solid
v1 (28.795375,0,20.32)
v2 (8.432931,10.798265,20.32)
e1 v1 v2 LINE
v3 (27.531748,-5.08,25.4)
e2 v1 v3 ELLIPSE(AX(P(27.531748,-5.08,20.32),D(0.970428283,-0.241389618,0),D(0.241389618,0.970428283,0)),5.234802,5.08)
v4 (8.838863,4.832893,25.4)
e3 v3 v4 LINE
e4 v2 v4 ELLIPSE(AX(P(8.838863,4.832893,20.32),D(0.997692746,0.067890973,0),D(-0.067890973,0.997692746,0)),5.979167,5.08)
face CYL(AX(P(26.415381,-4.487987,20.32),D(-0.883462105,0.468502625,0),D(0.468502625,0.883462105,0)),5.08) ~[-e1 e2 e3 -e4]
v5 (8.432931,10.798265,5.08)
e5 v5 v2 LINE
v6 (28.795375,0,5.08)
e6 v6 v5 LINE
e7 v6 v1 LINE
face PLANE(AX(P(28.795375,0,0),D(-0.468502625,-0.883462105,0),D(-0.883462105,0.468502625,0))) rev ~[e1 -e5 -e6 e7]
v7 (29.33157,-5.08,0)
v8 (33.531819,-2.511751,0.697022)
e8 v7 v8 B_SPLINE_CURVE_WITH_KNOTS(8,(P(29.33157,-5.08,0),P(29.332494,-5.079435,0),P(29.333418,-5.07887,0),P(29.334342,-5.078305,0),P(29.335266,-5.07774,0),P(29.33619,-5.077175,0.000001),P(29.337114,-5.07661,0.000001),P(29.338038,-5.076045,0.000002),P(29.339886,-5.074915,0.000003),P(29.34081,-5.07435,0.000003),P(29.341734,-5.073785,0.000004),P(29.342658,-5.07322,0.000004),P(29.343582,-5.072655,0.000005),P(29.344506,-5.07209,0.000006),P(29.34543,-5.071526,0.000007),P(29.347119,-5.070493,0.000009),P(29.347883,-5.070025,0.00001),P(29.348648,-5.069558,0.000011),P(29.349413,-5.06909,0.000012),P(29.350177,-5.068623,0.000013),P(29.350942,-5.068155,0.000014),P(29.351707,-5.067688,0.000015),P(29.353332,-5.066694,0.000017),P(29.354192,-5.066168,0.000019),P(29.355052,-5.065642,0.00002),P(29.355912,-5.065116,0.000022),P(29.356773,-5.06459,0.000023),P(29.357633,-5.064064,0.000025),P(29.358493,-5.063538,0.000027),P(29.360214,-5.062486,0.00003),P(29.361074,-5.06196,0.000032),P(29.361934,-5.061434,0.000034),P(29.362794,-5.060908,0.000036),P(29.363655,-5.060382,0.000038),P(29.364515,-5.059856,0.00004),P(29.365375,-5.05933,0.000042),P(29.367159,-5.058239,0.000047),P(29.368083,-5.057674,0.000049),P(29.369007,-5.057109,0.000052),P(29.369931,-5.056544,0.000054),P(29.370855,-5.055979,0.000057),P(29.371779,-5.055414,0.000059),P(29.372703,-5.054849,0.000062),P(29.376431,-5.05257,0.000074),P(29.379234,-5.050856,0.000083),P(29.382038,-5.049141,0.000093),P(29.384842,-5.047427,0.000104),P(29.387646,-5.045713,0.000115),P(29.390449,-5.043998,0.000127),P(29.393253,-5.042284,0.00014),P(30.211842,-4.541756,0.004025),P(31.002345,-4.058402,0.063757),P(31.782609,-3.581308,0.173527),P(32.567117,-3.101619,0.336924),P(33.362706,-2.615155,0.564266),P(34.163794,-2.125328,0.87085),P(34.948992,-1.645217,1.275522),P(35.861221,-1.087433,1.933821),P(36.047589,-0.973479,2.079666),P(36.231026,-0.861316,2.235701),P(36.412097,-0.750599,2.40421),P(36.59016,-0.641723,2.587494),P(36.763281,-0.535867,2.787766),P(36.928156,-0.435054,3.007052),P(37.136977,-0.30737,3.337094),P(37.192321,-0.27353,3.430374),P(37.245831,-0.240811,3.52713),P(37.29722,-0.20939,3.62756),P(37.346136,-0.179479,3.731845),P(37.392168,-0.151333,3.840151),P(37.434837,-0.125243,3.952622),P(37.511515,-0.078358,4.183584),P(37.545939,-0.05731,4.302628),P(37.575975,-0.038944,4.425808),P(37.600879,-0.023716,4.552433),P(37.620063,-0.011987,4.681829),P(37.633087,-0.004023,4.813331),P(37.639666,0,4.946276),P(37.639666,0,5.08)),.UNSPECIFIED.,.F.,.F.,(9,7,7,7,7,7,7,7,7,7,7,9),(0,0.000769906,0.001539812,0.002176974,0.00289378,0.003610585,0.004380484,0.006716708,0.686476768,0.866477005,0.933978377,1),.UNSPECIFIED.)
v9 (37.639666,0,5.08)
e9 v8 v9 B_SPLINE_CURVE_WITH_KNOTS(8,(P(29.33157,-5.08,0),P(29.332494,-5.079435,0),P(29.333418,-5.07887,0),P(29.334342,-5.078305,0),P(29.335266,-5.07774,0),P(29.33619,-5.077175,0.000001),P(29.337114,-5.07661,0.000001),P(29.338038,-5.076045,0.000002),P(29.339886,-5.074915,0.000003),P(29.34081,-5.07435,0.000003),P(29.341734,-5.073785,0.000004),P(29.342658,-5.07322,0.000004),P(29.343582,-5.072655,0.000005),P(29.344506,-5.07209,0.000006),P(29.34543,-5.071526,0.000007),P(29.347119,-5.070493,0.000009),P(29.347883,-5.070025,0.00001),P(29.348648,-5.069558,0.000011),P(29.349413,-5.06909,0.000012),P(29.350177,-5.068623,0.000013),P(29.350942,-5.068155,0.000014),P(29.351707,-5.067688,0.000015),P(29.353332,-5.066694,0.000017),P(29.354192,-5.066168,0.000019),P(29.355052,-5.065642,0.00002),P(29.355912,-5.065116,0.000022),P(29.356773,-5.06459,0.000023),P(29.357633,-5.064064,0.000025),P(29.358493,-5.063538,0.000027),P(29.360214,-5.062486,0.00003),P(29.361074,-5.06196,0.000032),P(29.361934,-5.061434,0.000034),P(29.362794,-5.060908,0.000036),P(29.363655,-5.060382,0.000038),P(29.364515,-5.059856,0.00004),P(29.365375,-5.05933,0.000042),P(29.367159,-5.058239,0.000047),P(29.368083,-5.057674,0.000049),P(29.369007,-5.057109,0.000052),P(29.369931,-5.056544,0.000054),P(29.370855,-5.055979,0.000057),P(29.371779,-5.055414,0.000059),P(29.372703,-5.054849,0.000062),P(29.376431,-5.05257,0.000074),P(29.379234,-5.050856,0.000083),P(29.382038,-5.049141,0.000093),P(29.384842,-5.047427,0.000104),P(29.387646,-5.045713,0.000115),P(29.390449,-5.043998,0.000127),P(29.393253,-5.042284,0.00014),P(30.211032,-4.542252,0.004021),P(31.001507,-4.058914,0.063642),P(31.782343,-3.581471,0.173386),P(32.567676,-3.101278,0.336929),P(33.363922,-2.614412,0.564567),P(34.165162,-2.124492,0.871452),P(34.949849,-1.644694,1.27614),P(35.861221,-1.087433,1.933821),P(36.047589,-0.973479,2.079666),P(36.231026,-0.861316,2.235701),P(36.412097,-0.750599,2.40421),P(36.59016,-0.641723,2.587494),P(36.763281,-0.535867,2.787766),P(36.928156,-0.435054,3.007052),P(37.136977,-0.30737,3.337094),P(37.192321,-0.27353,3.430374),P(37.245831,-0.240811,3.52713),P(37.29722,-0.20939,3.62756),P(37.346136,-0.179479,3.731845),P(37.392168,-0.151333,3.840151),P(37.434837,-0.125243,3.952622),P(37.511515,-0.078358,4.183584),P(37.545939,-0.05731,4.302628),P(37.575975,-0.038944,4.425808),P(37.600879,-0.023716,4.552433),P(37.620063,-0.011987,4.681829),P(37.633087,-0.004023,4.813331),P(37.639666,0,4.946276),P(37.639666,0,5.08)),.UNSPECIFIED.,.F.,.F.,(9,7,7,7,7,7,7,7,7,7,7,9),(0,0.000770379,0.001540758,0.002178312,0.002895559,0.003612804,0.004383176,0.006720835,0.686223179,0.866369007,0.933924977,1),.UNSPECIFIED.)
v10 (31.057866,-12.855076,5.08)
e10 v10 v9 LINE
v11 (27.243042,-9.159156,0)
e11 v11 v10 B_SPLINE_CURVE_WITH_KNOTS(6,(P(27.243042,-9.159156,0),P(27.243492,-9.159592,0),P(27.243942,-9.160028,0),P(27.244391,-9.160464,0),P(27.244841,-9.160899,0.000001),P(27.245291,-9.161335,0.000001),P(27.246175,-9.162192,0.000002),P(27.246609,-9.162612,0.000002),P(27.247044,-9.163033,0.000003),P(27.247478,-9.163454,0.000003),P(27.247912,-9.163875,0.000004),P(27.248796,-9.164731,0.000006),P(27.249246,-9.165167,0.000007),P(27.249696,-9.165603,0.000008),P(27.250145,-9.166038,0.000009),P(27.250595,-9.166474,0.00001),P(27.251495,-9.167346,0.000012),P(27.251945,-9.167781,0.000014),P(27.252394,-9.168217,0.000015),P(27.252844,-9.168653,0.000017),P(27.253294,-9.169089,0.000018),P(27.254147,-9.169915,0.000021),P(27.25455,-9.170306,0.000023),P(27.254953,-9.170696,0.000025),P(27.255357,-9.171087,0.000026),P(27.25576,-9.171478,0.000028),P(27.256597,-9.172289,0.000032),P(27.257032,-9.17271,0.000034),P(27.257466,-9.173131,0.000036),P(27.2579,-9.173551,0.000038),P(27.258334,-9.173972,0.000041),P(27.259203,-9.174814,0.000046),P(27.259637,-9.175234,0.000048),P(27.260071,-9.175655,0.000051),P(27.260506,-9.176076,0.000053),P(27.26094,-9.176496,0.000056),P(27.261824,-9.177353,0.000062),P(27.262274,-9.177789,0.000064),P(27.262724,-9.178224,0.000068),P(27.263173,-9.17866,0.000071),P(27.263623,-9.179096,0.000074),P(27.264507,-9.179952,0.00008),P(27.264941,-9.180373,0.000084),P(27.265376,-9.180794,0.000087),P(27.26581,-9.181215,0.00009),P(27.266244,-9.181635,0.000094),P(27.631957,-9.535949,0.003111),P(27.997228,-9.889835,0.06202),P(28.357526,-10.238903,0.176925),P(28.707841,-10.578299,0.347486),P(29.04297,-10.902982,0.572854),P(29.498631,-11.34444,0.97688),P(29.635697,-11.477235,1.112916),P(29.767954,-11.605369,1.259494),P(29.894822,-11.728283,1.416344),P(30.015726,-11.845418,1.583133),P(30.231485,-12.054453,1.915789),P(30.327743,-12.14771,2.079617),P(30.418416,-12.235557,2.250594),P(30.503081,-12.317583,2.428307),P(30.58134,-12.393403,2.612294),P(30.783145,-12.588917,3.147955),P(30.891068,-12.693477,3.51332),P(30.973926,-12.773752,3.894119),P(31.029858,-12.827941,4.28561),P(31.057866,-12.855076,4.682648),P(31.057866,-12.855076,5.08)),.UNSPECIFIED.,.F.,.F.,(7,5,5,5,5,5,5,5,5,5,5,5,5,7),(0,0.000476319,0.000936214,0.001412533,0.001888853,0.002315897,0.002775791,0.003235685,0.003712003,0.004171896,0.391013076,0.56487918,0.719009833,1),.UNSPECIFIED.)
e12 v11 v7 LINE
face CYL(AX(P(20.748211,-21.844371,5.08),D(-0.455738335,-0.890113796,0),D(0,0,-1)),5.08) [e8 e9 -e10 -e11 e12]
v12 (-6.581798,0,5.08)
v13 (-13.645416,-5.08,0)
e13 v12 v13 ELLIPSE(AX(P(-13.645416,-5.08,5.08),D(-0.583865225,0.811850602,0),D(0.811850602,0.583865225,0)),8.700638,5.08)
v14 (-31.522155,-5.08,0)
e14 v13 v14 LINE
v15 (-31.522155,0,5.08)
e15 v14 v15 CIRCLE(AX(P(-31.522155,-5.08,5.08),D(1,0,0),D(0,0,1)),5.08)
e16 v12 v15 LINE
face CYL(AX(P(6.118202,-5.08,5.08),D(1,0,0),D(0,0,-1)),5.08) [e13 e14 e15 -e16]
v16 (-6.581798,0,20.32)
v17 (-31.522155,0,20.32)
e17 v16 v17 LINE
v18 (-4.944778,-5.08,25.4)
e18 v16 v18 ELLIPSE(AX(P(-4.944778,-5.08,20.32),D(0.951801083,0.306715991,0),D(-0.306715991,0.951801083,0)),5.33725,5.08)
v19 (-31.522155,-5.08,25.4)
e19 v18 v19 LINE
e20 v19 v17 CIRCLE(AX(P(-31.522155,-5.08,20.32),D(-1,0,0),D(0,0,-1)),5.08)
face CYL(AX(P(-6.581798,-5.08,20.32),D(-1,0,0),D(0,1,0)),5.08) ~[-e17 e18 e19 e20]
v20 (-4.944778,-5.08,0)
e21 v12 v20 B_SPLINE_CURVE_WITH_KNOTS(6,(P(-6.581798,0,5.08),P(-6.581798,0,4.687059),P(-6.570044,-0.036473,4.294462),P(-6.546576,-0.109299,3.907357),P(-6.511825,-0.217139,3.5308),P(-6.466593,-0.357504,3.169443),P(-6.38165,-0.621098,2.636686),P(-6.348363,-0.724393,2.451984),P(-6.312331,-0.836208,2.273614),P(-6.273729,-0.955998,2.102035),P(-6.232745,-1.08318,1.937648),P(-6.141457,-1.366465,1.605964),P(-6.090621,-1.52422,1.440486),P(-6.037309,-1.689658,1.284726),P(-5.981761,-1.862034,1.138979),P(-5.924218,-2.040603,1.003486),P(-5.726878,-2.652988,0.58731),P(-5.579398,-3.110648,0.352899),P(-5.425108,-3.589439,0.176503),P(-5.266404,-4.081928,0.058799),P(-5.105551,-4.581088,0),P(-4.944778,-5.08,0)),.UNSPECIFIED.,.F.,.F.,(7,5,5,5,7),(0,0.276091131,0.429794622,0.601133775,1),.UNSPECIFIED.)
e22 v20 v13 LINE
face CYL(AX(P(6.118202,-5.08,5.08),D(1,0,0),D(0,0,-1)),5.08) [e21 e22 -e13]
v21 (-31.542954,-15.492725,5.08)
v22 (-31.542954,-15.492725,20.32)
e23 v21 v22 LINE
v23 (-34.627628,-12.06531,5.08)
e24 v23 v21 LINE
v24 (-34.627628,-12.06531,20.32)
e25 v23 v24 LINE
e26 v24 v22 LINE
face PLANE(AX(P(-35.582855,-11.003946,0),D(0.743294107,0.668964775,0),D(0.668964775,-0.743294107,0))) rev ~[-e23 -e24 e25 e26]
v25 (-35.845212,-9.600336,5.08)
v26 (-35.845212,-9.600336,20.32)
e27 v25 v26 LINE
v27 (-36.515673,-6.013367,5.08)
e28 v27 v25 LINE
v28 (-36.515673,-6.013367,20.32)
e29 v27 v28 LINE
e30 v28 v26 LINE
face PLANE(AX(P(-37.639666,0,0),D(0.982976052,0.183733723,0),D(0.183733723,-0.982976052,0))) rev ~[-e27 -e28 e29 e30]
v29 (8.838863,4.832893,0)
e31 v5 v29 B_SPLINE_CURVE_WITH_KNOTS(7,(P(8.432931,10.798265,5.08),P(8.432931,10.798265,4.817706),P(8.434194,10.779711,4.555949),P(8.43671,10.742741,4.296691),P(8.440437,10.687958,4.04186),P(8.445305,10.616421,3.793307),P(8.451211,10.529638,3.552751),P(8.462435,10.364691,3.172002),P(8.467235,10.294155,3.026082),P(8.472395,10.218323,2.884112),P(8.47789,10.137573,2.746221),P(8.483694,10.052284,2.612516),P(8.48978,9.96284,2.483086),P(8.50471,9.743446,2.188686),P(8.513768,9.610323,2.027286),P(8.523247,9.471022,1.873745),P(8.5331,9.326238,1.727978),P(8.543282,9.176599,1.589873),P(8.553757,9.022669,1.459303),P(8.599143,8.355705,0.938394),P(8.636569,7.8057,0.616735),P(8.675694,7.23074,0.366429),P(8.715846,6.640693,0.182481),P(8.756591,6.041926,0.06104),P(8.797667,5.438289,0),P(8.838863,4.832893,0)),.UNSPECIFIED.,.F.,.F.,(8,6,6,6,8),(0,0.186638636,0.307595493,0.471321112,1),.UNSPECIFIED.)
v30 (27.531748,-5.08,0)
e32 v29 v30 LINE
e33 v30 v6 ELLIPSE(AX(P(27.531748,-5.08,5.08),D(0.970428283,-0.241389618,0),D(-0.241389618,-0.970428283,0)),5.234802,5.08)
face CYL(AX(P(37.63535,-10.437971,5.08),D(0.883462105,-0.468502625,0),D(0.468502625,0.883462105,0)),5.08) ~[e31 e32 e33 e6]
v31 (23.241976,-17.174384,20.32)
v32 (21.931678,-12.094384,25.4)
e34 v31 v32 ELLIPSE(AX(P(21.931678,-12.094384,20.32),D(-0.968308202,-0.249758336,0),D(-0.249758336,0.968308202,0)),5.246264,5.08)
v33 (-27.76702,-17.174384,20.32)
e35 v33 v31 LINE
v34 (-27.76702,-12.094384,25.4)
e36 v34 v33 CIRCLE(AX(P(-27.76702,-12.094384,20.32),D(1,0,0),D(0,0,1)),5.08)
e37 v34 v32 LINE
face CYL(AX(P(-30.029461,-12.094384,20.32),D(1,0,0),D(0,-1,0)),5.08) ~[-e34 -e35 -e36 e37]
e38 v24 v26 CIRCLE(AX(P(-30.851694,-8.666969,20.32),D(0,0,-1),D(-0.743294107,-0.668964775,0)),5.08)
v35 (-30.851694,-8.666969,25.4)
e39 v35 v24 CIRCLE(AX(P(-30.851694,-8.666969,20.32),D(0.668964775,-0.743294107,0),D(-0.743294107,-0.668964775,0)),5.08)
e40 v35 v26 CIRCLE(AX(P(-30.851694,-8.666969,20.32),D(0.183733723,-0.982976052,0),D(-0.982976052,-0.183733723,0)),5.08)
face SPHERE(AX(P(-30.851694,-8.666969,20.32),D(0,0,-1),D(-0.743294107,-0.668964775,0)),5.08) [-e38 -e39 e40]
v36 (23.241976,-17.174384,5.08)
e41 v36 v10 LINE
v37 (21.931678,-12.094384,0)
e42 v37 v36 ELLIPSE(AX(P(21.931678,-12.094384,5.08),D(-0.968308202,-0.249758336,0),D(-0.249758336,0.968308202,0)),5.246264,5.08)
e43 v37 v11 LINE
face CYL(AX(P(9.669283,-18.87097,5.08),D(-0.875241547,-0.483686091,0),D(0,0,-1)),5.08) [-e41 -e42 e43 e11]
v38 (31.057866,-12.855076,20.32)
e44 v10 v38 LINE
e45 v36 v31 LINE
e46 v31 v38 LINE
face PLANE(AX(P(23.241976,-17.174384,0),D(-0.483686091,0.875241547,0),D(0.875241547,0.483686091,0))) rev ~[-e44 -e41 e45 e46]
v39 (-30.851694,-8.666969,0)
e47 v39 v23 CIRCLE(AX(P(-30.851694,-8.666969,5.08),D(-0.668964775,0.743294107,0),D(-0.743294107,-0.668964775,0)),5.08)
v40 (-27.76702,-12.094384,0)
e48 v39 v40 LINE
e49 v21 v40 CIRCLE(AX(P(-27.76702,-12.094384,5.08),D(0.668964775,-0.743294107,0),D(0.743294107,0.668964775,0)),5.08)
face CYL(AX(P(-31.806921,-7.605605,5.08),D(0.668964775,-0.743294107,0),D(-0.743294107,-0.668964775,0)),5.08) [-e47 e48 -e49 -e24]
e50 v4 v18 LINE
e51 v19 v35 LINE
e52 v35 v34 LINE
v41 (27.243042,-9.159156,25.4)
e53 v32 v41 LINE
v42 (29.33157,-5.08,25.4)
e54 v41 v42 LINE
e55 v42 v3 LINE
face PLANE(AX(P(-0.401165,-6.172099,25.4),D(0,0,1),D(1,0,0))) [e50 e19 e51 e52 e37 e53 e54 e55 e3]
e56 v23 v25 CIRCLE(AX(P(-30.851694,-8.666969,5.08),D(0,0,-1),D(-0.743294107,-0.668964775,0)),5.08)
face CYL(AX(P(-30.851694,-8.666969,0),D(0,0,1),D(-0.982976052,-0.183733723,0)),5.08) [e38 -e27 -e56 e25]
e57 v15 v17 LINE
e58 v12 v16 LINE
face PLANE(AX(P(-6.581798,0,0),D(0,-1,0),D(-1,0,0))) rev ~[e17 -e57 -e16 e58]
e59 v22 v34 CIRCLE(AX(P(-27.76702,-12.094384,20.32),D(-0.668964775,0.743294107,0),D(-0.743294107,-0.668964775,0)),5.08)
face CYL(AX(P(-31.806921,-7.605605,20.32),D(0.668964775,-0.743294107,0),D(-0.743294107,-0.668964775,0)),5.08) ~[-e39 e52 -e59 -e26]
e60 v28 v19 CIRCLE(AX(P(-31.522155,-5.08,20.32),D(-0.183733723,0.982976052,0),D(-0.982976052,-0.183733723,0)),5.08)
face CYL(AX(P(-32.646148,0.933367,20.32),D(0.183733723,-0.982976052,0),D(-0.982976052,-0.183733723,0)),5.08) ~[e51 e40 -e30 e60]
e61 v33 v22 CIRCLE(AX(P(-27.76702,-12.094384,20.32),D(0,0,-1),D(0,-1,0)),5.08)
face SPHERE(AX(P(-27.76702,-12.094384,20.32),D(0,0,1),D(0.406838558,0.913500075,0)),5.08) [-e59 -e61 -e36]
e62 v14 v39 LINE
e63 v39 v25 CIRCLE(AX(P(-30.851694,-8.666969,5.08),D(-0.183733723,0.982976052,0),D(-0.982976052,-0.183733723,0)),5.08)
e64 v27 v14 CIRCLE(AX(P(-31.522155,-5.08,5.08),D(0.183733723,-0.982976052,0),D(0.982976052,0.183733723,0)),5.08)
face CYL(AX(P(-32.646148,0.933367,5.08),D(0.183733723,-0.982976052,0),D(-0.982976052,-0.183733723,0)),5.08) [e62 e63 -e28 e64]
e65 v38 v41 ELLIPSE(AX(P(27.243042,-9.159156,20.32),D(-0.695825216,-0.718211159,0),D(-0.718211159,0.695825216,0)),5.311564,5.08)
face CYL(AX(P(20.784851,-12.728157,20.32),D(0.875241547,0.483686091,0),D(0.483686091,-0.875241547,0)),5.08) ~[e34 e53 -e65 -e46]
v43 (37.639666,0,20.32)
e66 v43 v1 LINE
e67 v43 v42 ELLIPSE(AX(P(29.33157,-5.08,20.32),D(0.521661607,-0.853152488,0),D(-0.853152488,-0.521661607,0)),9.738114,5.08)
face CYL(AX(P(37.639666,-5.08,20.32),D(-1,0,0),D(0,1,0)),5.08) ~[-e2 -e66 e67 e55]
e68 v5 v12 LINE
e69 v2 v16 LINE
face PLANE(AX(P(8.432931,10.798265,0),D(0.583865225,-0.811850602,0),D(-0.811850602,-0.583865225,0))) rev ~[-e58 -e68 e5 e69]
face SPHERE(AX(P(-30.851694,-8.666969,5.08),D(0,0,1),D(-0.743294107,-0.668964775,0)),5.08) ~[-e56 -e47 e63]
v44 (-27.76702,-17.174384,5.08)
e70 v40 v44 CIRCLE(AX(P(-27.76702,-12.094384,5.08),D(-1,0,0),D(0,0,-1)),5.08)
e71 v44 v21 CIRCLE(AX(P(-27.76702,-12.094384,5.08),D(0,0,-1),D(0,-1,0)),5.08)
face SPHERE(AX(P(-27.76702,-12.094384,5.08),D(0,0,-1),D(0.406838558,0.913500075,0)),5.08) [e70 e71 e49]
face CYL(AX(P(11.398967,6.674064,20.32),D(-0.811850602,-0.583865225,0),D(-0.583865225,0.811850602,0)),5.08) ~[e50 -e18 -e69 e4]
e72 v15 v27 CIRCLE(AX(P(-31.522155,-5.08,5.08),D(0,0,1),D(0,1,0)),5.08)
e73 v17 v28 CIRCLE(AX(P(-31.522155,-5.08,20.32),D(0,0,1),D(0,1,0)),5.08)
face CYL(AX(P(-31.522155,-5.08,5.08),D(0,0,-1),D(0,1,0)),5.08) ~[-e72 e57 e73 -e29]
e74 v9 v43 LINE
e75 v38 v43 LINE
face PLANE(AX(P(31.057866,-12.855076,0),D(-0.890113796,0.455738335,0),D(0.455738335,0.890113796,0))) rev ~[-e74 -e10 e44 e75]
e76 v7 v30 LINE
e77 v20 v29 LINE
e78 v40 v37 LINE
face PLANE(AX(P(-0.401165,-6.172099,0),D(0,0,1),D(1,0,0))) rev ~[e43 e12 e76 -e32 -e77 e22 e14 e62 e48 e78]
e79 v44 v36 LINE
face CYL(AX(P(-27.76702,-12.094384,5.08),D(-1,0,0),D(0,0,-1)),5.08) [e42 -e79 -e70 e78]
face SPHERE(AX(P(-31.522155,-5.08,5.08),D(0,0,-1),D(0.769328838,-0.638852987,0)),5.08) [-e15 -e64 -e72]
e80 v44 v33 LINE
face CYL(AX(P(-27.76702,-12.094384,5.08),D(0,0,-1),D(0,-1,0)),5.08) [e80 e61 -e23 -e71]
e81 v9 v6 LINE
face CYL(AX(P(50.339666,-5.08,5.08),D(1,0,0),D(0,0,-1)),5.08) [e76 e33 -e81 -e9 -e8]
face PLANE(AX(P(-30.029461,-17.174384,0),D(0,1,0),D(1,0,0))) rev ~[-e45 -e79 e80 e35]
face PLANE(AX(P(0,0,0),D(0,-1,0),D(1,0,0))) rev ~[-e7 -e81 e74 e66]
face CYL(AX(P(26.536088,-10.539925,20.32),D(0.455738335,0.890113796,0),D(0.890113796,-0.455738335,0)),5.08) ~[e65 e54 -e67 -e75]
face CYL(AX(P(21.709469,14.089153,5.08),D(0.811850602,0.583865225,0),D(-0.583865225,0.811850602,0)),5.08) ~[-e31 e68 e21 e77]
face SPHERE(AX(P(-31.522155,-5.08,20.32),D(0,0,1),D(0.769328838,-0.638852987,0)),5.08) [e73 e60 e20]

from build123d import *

# Parameters (mm, degrees)
F2_DEPTH     = 25.4
F3_R         = 5.08
F4_T1_DEPTH  = 63.7089962256
F4_T3_DEPTH  = 34.3299805756
F4_T5_DEPTH  = 39.8420593032
F4_T7_DEPTH  = 15.24
F4_T12_DEPTH = 5.08
F4_T18_DEPTH = 5.08
F4_T24_DEPTH = 5.08
F4_T30_DEPTH = 5.08
F4_T36_DEPTH = 37.6403571065
F4_T41_DEPTH = 43.8944483223
F4_T46_DEPTH = 48.4484626095
F4_T51_DEPTH = 34.2442917913
F4_T57_DEPTH = 43.8944483223
F4_T61_DEPTH = 37.6403571065
F4_T68_DEPTH = 48.4484626095
F4_T72_DEPTH = 34.2442917913


# Not quite as in the source:
# - a fillet or chamfer that OpenCascade refuses, or shapes differently, is made with other operations: its cross-section is extruded or revolved along the edge and cut away or added


with BuildPart() as f2:
    # F1 (on face) → F2 (new body)
    with BuildSketch(Plane.XY):
        Polygon((8.4329312667, 10.7982652262), (-6.5817977302, 0), (-37.6396663487, 0), (-35.5828553438, -11.0039459541), (-30.0294607878, -17.1743836254), (23.241976276, -17.1743836254), (31.0578662902, -12.8550762311), (37.6396663487, 0), (28.7953745574, 0), align=None)
    extrude(amount=F2_DEPTH)

    # F3
    f3_edges = [f2.edges().sort_by_distance(p)[0] for p in [
        (-22.110732, 0, 25.4),
        (18.614153, 5.399133, 25.4),
        (33.21752, 0, 25.4),
        (34.348766, -6.427538, 25.4),
        (27.149921, -15.01473, 25.4),
        (-3.393742, -17.174384, 25.4),
        (-32.806158, -14.089165, 25.4),
        (-36.611261, -5.501973, 25.4),
        (-32.806158, -14.089165, 0),
        (-36.611261, -5.501973, 0),
        (-35.582855, -11.003946, 12.7),
        (0.925567, 5.399133, 25.4),
    ]]
    fillet(f3_edges, radius=F3_R)

    # F4: fillet of radius 5.08 on 11 edges, made by hand

    # F4_s2 → F4_t1 (cut)
    with BuildSketch(Plane.YZ.offset(-27.7670199495)):
        with BuildLine():
            ThreePointArc((-12.0943836254, 0), (-15.6864860738, 1.4878975516), (-17.1743836254, 5.08))
            Line((-17.1743836254, 5.08), (-17.1743836254, 0))
            Line((-17.1743836254, 0), (-12.0943836254, 0))
        make_face()
    extrude(amount=F4_T1_DEPTH, mode=Mode.SUBTRACT)

    # F4_s4 → F4_t3 (cut)
    with BuildSketch(Plane(origin=(-0.5817443509, -0.3214902809, 0), x_dir=(0, 0, 1), z_dir=(0.8752415471, 0.4836860907, 0))):
        with BuildLine():
            ThreePointArc((0, 21.1935547384), (1.4878975516, 24.7856571868), (5.08, 26.2735547384))
            Line((5.08, 26.2735547384), (0, 26.2735547384))
            Line((0, 26.2735547384), (0, 21.1935547384))
        make_face()
    extrude(amount=F4_T3_DEPTH, mode=Mode.SUBTRACT)

    # F4_s6 → F4_t5 (cut)
    with BuildSketch(Plane(origin=(-4.5520149502, -8.8906528107, 0), x_dir=(0, 0, 1), z_dir=(0.4557383348, 0.8901137962, 0))):
        with BuildLine():
            ThreePointArc((0, 28.4235863007), (1.4878975516, 32.0156887492), (5.08, 33.5035863007))
            Line((5.08, 33.5035863007), (0, 33.5035863007))
            Line((0, 33.5035863007), (0, 28.4235863007))
        make_face()
    extrude(amount=F4_T5_DEPTH, mode=Mode.SUBTRACT)

    # F4_s8 → F4_t7 (cut)
    with BuildSketch(Plane.XY.offset(5.08)):
        with BuildLine():
            ThreePointArc((-31.5221548367, 0), (-35.430345336, -1.8346268287), (-36.5156731811, -6.0133673145))
            Line((-36.5156731811, -6.0133673145), (-37.6396663487, 0))
            Line((-37.6396663487, 0), (-31.5221548367, 0))
        make_face()
        with BuildLine():
            ThreePointArc((-27.7670199495, -17.1743836254), (-29.8337598255, -16.7349640077), (-31.5429540141, -15.4927246824))
            Line((-31.5429540141, -15.4927246824), (-30.0294607878, -17.1743836254))
            Line((-30.0294607878, -17.1743836254), (-27.7670199495, -17.1743836254))
        make_face()
    extrude(amount=F4_T7_DEPTH, mode=Mode.SUBTRACT)


with BuildPart() as f4_tool10:
    # F4_s11 → F4_t12 (new body)
    with BuildSketch(Plane.XY.offset(20.32)):
        Polygon((-27.7670199495, -12.0943836254), (-27.7670199495, -17.1743836254), (-30.0294607878, -17.1743836254), (-31.5429540141, -15.4927246824), align=None)
    extrude(amount=F4_T12_DEPTH)

    # F4_s13 → F4_t14 (revolve, cut)
    with BuildSketch(Plane(origin=(-27.7670199495, -12.0943836254, 20.32), x_dir=(0.4068385583, 0.9135000753, 0), z_dir=(0.9135000753, -0.4068385583, 0))):
        with BuildLine():
            ThreePointArc((0, -5.08), (5.08, 0), (0, 5.08))
            Line((0, 5.08), (0, -5.08))
        make_face()
    revolve(axis=Axis((-27.7670199495, -12.0943836254, 20.32), (0, 0, 1)), mode=Mode.SUBTRACT)


with BuildPart() as f2_1:
    add(f2.part)

    # F4_t9: cut F4_tool10
    add(f4_tool10.part, mode=Mode.SUBTRACT)


with BuildPart() as f4_tool16:
    # F4_s17 → F4_t18 (new body)
    with BuildSketch(Plane.XY.offset(20.32)):
        Polygon((-31.5221548367, -5.08), (-31.5221548367, 0), (-37.6396663487, 0), (-36.5156731811, -6.0133673145), align=None)
    extrude(amount=F4_T18_DEPTH)

    # F4_s19 → F4_t20 (revolve, cut)
    with BuildSketch(Plane(origin=(-31.5221548367, -5.08, 20.32), x_dir=(0.7693288384, -0.6388529865, 0), z_dir=(-0.6388529865, -0.7693288384, 0))):
        with BuildLine():
            ThreePointArc((0, -5.08), (5.08, 0), (0, 5.08))
            Line((0, 5.08), (0, -5.08))
        make_face()
    revolve(axis=Axis((-31.5221548367, -5.08, 20.32), (0, 0, 1)), mode=Mode.SUBTRACT)


with BuildPart() as f2_2:
    add(f2_1.part)

    # F4_t15: cut F4_tool16
    add(f4_tool16.part, mode=Mode.SUBTRACT)


with BuildPart() as f4_tool22:
    # F4_s23 → F4_t24 (new body)
    with BuildSketch(Plane.XY.offset(5.08)):
        Polygon((-27.7670199495, -12.0943836254), (-27.7670199495, -17.1743836254), (-30.0294607878, -17.1743836254), (-31.5429540141, -15.4927246824), align=None)
    extrude(amount=-F4_T24_DEPTH)

    # F4_s25 → F4_t26 (revolve, cut)
    with BuildSketch(Plane(origin=(-27.7670199495, -12.0943836254, 5.08), x_dir=(0.4068385583, 0.9135000753, 0), z_dir=(-0.9135000753, 0.4068385583, 0))):
        with BuildLine():
            ThreePointArc((0, -5.08), (5.08, 0), (0, 5.08))
            Line((0, 5.08), (0, -5.08))
        make_face()
    revolve(axis=Axis((-27.7670199495, -12.0943836254, 5.08), (0, 0, -1)), mode=Mode.SUBTRACT)


with BuildPart() as f2_3:
    add(f2_2.part)

    # F4_t21: cut F4_tool22
    add(f4_tool22.part, mode=Mode.SUBTRACT)


with BuildPart() as f4_tool28:
    # F4_s29 → F4_t30 (new body)
    with BuildSketch(Plane.XY.offset(5.08)):
        Polygon((-31.5221548367, -5.08), (-31.5221548367, 0), (-37.6396663487, 0), (-36.5156731811, -6.0133673145), align=None)
    extrude(amount=-F4_T30_DEPTH)

    # F4_s31 → F4_t32 (revolve, cut)
    with BuildSketch(Plane(origin=(-31.5221548367, -5.08, 5.08), x_dir=(0.7693288384, -0.6388529865, 0), z_dir=(0.6388529865, 0.7693288384, 0))):
        with BuildLine():
            ThreePointArc((0, -5.08), (5.08, 0), (0, 5.08))
            Line((0, 5.08), (0, -5.08))
        make_face()
    revolve(axis=Axis((-31.5221548367, -5.08, 5.08), (0, 0, -1)), mode=Mode.SUBTRACT)


with BuildPart() as f2_4:
    add(f2_3.part)

    # F4_t27: cut F4_tool28
    add(f4_tool28.part, mode=Mode.SUBTRACT)


with BuildPart() as f4_tool34:
    # F4_s35 → F4_t36 (new body)
    with BuildSketch(Plane.YZ.offset(6.1182022698)):
        with BuildLine():
            ThreePointArc((-5.08, 0), (-1.4878975516, 1.4878975516), (0, 5.08))
            Line((0, 5.08), (0, 0))
            Line((0, 0), (-5.08, 0))
        make_face()
    extrude(amount=-F4_T36_DEPTH)

    split(bisect_by=Plane(origin=(-2.2437256361, 3.119846722, 0), x_dir=(0, 0, 1), z_dir=(-0.5838652247, 0.8118506016, 0)), keep=Keep.TOP)


with BuildPart() as f2_5:
    add(f2_4.part)

    # F4_t33: cut F4_tool34
    add(f4_tool34.part, mode=Mode.SUBTRACT)


with BuildPart() as f4_tool39:
    # F4_s40 → F4_t41 (new body)
    with BuildSketch(Plane(origin=(20.9871595433, 15.0935068584, 0), x_dir=(0, 0, 1), z_dir=(-0.8118506016, -0.5838652247, 0))):
        with BuildLine():
            ThreePointArc((5.08, 3.8428828109), (1.4878975516, 2.3549852594), (0, -1.2371171891))
            Line((0, -1.2371171891), (0, 3.8428828109))
            Line((0, 3.8428828109), (5.08, 3.8428828109))
        make_face()
    extrude(amount=F4_T41_DEPTH)

    split(bisect_by=Plane.XZ, keep=Keep.BOTTOM)


with BuildPart() as f2_6:
    add(f2_5.part)

    # F4_t38: cut F4_tool39
    add(f4_tool39.part, mode=Mode.SUBTRACT)


with BuildPart() as f4_tool44:
    # F4_s45 → F4_t46 (new body)
    with BuildSketch(Plane(origin=(33.6949109219, -17.8685131108, 0), x_dir=(0, 0, 1), z_dir=(-0.8834621049, 0.4685026246, 0))):
        with BuildLine():
            ThreePointArc((5.08, 13.4907085573), (1.4878975516, 12.0028110057), (0, 8.4107085573))
            Line((0, 8.4107085573), (0, 13.4907085573))
            Line((0, 13.4907085573), (5.08, 13.4907085573))
        make_face()
    extrude(amount=F4_T46_DEPTH)

    split(bisect_by=Plane.XZ, keep=Keep.BOTTOM)


with BuildPart() as f2_7:
    add(f2_6.part)

    # F4_t43: cut F4_tool44
    add(f4_tool44.part, mode=Mode.SUBTRACT)


with BuildPart() as f4_tool49:
    # F4_s50 → F4_t51 (new body)
    with BuildSketch(Plane.YZ.offset(50.3396663487)):
        with BuildLine():
            ThreePointArc((-5.08, 0), (-1.4878975516, 1.4878975516), (0, 5.08))
            Line((0, 5.08), (0, 0))
            Line((0, 0), (-5.08, 0))
        make_face()
    extrude(amount=-F4_T51_DEPTH)

    split(bisect_by=Plane(origin=(6.3204323672, 11.918529778, 0), x_dir=(0, 0, 1), z_dir=(0.4685026246, 0.8834621049, 0)), keep=Keep.TOP)


with BuildPart() as f2_8:
    add(f2_7.part)

    # F4_t48: cut F4_tool49
    add(f4_tool49.part, mode=Mode.SUBTRACT)


with BuildPart() as f4_tool55:
    # F4_s56 → F4_t57 (new body)
    with BuildSketch(Plane(origin=(20.9871595433, 15.0935068584, 0), x_dir=(0, 0, 1), z_dir=(-0.8118506016, -0.5838652247, 0))):
        with BuildLine():
            ThreePointArc((5.08, 3.8428828109), (1.4878975516, 2.3549852594), (0, -1.2371171891))
            Line((0, -1.2371171891), (0, 3.8428828109))
            Line((0, 3.8428828109), (5.08, 3.8428828109))
        make_face()
    extrude(amount=F4_T57_DEPTH)

    split(bisect_by=Plane.XZ, keep=Keep.TOP)


with BuildPart() as f4_tool59:
    # F4_s60 → F4_t61 (new body)
    with BuildSketch(Plane.YZ.offset(6.1182022698)):
        with BuildLine():
            ThreePointArc((-5.08, 0), (-1.4878975516, 1.4878975516), (0, 5.08))
            Line((0, 5.08), (0, 0))
            Line((0, 0), (-5.08, 0))
        make_face()
    extrude(amount=-F4_T61_DEPTH)

    split(bisect_by=Plane(origin=(-2.2437256361, 3.119846722, 0), x_dir=(0, 0, 1), z_dir=(0.5838652247, -0.8118506016, 0)), keep=Keep.TOP)


with BuildPart() as f4_tool55_1:
    add(f4_tool55.part)

    # F4_t63: intersect F4_tool59
    add(f4_tool59.part, mode=Mode.INTERSECT)


with BuildPart() as f2_9:
    add(f2_8.part)

    # F4_t53: cut F4_tool55
    add(f4_tool55_1.part, mode=Mode.SUBTRACT)


with BuildPart() as f4_tool66:
    # F4_s67 → F4_t68 (new body)
    with BuildSketch(Plane(origin=(33.6949109219, -17.8685131108, 0), x_dir=(0, 0, 1), z_dir=(-0.8834621049, 0.4685026246, 0))):
        with BuildLine():
            ThreePointArc((5.08, 13.4907085573), (1.4878975516, 12.0028110057), (0, 8.4107085573))
            Line((0, 8.4107085573), (0, 13.4907085573))
            Line((0, 13.4907085573), (5.08, 13.4907085573))
        make_face()
    extrude(amount=F4_T68_DEPTH)

    split(bisect_by=Plane.XZ, keep=Keep.TOP)


with BuildPart() as f4_tool70:
    # F4_s71 → F4_t72 (new body)
    with BuildSketch(Plane.YZ.offset(50.3396663487)):
        with BuildLine():
            ThreePointArc((-5.08, 0), (-1.4878975516, 1.4878975516), (0, 5.08))
            Line((0, 5.08), (0, 0))
            Line((0, 0), (-5.08, 0))
        make_face()
    extrude(amount=-F4_T72_DEPTH)

    split(bisect_by=Plane(origin=(6.3204323672, 11.918529778, 0), x_dir=(0, 0, 1), z_dir=(-0.4685026246, -0.8834621049, 0)), keep=Keep.TOP)


with BuildPart() as f4_tool66_1:
    add(f4_tool66.part)

    # F4_t74: intersect F4_tool70
    add(f4_tool70.part, mode=Mode.INTERSECT)


with BuildPart() as f2_10:
    add(f2_9.part)

    # F4_t64: cut F4_tool66
    add(f4_tool66_1.part, mode=Mode.SUBTRACT)


solid = f2_10.part
